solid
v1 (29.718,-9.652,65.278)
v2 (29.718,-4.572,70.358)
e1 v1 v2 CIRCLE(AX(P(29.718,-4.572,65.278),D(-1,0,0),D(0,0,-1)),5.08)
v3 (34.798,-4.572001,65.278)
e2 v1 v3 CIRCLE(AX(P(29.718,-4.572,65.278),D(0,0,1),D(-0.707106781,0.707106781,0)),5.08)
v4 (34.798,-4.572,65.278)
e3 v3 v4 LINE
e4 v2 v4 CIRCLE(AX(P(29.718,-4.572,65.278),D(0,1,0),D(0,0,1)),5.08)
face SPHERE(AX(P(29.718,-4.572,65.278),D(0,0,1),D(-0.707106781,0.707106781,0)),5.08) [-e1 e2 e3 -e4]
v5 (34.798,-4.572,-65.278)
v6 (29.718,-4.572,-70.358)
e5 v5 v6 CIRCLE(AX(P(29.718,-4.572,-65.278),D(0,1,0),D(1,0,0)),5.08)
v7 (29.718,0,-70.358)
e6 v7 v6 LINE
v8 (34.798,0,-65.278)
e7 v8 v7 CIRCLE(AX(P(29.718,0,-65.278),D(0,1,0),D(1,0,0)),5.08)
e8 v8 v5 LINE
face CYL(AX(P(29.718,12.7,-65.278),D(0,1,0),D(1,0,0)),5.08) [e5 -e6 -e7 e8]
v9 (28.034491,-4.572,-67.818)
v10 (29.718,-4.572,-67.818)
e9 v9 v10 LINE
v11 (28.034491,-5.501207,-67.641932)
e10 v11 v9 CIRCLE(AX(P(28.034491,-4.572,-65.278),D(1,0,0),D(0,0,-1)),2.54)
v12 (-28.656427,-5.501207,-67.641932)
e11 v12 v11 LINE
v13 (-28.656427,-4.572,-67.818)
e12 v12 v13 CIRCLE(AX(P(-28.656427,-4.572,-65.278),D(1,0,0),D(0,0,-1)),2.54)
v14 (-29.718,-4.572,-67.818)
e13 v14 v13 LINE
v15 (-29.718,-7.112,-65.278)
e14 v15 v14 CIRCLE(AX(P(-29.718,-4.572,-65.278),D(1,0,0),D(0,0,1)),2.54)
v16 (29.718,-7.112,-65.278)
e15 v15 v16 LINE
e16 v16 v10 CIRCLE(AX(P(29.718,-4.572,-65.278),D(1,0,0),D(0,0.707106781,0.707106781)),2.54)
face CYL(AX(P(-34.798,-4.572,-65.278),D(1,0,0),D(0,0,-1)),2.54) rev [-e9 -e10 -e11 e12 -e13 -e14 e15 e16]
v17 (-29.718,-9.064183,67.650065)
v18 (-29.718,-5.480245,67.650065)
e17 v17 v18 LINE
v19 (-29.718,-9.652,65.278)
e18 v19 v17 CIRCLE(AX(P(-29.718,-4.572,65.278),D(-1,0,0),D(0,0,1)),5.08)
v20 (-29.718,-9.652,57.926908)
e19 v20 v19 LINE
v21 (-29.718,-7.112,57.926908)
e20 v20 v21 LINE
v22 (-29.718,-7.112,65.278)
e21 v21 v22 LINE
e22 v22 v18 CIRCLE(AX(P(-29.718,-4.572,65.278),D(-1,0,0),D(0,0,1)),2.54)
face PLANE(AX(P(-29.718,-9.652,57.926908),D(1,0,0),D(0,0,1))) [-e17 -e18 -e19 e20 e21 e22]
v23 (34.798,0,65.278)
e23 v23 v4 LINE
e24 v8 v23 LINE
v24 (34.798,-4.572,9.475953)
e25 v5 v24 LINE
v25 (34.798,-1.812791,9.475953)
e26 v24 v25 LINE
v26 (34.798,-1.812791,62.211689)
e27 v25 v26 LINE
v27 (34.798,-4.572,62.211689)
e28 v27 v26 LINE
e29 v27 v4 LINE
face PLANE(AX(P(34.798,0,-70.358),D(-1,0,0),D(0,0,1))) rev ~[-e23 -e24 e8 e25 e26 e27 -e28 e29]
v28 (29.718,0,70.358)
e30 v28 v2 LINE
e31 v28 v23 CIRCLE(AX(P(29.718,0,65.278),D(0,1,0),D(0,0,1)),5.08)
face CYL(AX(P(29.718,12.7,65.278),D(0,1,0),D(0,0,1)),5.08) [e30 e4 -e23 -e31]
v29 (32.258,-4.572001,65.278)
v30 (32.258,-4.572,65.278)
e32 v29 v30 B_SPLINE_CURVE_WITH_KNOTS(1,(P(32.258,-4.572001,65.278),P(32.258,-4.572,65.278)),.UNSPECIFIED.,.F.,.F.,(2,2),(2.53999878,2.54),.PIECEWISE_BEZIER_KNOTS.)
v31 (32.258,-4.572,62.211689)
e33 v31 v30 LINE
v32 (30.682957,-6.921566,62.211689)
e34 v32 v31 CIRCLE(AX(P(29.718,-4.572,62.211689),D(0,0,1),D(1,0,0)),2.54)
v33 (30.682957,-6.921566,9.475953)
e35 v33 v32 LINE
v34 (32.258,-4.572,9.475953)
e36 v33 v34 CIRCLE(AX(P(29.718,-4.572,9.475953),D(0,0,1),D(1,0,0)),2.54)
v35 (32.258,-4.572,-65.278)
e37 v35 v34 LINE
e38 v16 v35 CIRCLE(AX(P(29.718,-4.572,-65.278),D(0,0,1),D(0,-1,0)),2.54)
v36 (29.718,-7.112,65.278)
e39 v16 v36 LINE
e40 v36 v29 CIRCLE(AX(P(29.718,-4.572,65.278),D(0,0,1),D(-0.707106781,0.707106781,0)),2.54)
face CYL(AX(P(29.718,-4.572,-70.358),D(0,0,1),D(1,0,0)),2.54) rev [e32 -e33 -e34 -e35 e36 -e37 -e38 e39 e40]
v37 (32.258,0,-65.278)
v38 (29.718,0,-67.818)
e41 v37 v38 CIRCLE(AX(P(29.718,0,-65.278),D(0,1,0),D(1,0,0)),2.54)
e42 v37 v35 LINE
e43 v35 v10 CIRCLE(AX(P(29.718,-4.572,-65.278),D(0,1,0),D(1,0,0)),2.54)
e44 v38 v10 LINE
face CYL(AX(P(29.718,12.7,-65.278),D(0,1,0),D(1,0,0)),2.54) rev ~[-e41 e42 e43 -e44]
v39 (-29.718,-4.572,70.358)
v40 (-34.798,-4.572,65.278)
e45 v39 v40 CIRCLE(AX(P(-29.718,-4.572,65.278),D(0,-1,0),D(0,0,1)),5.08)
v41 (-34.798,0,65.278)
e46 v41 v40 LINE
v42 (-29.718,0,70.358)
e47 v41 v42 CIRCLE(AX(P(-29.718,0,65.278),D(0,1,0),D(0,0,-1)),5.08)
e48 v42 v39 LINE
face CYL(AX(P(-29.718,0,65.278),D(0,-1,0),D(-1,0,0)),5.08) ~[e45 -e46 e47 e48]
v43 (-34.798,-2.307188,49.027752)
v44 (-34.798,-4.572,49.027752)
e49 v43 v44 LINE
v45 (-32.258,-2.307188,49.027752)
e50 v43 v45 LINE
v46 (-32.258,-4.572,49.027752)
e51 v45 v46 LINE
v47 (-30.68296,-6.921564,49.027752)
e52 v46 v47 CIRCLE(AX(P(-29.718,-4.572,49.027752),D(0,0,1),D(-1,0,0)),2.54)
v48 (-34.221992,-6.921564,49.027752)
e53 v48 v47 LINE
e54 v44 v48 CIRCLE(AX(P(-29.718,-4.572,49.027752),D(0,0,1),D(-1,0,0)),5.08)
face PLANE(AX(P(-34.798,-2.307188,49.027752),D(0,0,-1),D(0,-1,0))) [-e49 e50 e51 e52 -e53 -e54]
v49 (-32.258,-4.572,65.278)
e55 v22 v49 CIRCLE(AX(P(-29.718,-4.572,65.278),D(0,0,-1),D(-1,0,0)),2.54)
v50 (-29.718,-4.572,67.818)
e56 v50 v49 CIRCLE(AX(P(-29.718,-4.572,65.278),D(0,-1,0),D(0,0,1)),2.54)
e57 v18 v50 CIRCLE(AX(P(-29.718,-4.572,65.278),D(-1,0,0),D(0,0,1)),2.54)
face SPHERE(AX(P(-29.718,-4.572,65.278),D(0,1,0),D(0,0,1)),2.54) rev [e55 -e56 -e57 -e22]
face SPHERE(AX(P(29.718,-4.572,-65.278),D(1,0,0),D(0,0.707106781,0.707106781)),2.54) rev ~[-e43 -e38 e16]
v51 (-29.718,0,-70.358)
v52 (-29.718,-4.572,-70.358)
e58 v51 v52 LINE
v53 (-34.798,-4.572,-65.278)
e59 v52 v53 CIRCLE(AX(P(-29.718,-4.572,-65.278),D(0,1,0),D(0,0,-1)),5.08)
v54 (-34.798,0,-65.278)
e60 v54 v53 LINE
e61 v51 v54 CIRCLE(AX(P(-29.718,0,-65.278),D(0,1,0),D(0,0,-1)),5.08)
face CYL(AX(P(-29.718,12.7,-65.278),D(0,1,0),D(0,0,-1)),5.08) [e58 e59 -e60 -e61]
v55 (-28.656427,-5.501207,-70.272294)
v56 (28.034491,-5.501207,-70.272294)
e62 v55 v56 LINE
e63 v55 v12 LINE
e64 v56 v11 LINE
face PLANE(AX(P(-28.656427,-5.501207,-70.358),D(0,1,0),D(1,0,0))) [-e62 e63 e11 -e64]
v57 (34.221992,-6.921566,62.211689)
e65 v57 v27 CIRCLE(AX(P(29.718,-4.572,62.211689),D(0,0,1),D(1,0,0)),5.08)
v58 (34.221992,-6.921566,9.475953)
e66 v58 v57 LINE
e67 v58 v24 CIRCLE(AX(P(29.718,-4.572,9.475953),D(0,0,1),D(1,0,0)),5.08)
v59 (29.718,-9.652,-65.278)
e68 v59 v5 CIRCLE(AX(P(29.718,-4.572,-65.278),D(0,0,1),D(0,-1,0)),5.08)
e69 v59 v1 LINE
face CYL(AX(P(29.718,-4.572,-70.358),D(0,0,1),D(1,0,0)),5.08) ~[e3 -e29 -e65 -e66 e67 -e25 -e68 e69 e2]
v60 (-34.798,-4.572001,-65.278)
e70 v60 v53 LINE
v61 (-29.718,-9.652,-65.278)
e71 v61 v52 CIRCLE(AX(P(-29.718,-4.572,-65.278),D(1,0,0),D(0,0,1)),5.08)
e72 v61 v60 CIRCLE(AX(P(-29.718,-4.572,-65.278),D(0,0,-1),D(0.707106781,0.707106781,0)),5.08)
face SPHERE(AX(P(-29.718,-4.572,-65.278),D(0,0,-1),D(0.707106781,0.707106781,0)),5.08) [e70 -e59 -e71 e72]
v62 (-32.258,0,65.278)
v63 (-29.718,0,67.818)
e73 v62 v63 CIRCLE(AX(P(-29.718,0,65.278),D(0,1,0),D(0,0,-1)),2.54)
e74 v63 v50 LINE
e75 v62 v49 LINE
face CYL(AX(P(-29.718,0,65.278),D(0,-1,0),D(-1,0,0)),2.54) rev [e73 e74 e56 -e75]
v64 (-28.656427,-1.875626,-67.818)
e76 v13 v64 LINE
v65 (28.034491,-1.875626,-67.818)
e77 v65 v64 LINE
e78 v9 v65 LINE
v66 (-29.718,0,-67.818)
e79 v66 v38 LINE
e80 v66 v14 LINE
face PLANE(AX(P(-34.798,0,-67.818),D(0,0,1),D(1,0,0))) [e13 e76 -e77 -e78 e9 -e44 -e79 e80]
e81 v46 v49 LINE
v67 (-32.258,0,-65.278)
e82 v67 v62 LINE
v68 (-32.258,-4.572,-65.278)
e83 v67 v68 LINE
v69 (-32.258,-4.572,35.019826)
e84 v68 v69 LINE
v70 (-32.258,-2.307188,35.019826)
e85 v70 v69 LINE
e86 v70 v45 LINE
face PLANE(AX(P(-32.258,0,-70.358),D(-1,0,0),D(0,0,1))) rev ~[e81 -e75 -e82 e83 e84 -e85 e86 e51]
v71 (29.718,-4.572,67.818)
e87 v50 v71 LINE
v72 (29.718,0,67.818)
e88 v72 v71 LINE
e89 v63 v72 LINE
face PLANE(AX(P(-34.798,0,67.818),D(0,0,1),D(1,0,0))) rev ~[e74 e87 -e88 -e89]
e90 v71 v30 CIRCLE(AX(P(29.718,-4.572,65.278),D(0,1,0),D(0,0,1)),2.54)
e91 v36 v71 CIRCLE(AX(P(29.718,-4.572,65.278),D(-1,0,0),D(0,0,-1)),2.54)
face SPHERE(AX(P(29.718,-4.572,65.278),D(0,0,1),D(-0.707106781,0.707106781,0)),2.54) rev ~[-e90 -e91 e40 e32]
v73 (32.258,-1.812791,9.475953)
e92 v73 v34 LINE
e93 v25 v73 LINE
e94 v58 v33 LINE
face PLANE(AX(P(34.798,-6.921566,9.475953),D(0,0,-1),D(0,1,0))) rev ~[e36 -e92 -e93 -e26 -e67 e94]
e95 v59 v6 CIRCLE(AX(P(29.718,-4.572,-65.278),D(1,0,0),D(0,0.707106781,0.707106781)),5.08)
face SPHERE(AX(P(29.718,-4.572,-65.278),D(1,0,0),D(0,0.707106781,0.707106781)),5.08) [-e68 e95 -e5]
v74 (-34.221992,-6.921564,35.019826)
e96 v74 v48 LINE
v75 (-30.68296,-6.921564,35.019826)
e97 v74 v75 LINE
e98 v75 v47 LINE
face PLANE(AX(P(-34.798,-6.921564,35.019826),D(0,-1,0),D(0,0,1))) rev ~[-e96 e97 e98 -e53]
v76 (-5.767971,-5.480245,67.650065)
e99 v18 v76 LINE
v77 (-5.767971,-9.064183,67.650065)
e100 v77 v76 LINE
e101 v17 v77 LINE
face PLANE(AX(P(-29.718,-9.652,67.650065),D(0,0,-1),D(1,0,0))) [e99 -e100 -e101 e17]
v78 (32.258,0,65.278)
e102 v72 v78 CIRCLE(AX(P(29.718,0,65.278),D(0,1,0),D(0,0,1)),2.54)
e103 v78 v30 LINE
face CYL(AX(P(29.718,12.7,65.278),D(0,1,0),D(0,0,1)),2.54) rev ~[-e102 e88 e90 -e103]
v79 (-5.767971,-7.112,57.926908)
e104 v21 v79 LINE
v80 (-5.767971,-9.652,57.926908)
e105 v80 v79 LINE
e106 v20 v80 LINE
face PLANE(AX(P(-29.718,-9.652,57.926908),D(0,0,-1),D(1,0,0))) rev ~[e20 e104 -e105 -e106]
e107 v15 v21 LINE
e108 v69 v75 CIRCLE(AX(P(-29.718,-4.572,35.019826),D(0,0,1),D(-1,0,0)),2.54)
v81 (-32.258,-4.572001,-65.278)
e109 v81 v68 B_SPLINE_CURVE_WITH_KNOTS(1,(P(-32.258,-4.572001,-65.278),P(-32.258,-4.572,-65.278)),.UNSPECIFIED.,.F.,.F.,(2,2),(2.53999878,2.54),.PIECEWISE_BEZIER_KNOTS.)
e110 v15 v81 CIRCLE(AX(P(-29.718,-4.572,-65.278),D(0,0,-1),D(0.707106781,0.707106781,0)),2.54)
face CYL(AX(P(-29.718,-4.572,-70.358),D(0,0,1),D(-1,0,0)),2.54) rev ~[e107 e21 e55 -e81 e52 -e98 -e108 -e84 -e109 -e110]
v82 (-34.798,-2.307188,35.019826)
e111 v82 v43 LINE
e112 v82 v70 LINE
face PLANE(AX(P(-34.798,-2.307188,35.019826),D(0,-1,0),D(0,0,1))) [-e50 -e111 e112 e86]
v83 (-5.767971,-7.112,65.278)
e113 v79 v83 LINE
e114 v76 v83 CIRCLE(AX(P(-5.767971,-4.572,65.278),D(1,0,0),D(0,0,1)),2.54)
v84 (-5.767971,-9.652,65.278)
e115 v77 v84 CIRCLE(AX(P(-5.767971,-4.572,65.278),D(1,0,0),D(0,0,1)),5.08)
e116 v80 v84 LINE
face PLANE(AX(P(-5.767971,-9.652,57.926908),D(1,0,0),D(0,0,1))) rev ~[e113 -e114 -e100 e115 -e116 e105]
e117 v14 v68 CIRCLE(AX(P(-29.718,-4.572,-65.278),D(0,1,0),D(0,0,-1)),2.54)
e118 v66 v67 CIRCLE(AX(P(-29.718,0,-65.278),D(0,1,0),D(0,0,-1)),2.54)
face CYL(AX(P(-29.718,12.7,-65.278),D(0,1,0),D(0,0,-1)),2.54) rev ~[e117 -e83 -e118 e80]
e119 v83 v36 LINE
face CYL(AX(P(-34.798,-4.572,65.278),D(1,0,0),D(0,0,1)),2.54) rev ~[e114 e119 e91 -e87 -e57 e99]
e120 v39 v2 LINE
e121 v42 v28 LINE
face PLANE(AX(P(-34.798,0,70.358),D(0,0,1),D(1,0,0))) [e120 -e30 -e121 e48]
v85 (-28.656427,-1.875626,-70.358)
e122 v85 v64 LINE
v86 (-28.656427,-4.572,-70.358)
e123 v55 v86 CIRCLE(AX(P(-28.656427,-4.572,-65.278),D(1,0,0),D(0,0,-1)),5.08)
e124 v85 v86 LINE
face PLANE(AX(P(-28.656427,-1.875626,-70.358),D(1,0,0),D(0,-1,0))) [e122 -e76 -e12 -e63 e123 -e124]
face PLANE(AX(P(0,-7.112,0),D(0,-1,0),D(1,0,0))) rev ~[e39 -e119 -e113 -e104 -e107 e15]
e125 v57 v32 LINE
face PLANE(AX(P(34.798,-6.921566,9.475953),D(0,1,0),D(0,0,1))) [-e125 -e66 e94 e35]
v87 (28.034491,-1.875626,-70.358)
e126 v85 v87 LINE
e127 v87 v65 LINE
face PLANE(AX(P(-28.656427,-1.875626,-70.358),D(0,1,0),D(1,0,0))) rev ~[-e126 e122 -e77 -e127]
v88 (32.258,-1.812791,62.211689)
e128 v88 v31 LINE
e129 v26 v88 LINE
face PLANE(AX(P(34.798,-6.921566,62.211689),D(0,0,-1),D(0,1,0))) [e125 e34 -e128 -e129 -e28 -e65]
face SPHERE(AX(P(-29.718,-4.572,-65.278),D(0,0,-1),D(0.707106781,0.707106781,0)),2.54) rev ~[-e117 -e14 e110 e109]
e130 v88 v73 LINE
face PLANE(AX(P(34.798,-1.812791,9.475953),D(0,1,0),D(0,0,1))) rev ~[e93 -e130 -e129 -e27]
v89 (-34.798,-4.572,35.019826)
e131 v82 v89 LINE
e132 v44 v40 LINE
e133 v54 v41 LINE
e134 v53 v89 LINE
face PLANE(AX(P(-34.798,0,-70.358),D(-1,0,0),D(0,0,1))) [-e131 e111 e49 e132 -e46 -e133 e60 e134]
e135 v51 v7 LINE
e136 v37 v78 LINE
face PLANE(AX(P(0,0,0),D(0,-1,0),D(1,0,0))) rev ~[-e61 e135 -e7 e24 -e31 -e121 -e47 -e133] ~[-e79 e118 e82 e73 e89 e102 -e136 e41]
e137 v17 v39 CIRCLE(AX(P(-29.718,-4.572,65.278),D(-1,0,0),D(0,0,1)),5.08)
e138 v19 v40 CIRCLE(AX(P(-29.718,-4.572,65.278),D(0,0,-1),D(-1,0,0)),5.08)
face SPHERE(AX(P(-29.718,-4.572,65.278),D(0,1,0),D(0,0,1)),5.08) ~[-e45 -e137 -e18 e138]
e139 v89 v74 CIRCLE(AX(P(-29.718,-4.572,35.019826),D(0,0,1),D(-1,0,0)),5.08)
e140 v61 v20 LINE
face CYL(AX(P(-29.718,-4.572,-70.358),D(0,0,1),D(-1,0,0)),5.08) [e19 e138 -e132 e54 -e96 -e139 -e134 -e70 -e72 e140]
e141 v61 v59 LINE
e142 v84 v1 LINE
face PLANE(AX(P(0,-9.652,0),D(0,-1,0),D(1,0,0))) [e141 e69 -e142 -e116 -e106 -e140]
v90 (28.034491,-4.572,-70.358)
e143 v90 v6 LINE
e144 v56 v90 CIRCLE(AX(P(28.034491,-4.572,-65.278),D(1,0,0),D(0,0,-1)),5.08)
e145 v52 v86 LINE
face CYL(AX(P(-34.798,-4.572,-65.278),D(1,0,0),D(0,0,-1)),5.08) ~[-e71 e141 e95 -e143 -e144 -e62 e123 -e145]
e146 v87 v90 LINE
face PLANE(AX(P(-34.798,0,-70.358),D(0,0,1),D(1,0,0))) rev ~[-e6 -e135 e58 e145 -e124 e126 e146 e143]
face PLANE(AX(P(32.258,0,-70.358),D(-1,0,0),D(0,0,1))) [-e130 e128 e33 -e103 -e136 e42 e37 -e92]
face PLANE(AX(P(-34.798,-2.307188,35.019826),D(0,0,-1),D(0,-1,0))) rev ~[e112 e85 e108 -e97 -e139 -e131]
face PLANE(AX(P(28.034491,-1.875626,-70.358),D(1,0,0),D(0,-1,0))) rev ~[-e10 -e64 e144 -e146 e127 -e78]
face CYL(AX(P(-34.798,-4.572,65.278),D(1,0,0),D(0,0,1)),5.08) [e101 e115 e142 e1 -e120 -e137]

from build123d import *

# Parameters (mm, degrees)
F0_W        = 69.596
F0_H        = 140.716
F1_DEPTH    = 9.652
F2_R        = 5.08
F3_T1_DEPTH = 17.272
F3_S5_W     = 5.08
F3_S5_H     = 5.08
F3_T6_DEPTH = 5.08
F4_T1_DEPTH = 17.272
F4_S5_W     = 5.08
F4_S5_H     = 5.08
F4_T6_DEPTH = 5.08
F5_T1_DEPTH = 17.272
F5_S5_W     = 5.08
F5_S5_H     = 5.08
F5_T6_DEPTH = 5.08
F6_T        = -2.54
F7_W        = 23.9500291884
F7_H        = 9.7231566906
F8_DEPTH    = 25.4
F9_W        = 5.1087748725
F9_H        = 52.7357356623
F10_DEPTH   = 25.4
F11_W       = 4.6143759973
F11_H       = 14.0079259872
F12_DEPTH   = 25.4
F14_W       = 56.6909182817
F14_H       = 3.6255817395
F15_DEPTH   = 25.4


# Not quite as in the source:
# - a fillet or chamfer that OpenCascade refuses, or shapes differently, is made with other operations: its cross-section is extruded or revolved along the edge and cut away or added


with BuildPart() as f1:
    # F0 (on Front) → F1 (new body)
    with BuildSketch(Plane.XZ):
        Rectangle(F0_W, F0_H)
    extrude(amount=F1_DEPTH)

    # F2
    f2_edges = [f1.edges().sort_by_distance(p)[0] for p in [
        (-34.798, -4.826, 70.358),
        (0, -9.652, 70.358),
        (-34.798, -9.652, 0),
        (0, -9.652, -70.358),
        (34.798, -9.652, 0),
    ]]
    fillet(f2_edges, radius=F2_R)

    # F3: fillet of radius 5.08 on 1 edges, made by hand

    # F3_s2 → F3_t1 (cut)
    with BuildSketch(Plane.XZ.offset(-12.7)):
        with BuildLine():
            ThreePointArc((29.718, 70.358), (33.3101024484, 68.8701024484), (34.798, 65.278))
            Line((34.798, 65.278), (34.798, 70.358))
            Line((34.798, 70.358), (29.718, 70.358))
        make_face()
    extrude(amount=F3_T1_DEPTH, mode=Mode.SUBTRACT)


with BuildPart() as f3_tool4:
    # F3_s5 → F3_t6 (new body)
    with BuildSketch(Plane.XY.offset(65.278)):
        with Locations((32.258, -7.112)):
            Rectangle(F3_S5_W, F3_S5_H)
    extrude(amount=F3_T6_DEPTH)

    # F3_s7 → F3_t8 (revolve, cut)
    with BuildSketch(Plane(origin=(29.718, -4.572, 65.278), x_dir=(-0.7071067812, 0.7071067812, 0), z_dir=(0.7071067812, 0.7071067812, 0))):
        with BuildLine():
            ThreePointArc((0, -5.08), (5.08, 0), (0, 5.08))
            Line((0, 5.08), (0, -5.08))
        make_face()
    revolve(axis=Axis((29.718, -4.572, 65.278), (0, 0, 1)), mode=Mode.SUBTRACT)


with BuildPart() as f1_1:
    add(f1.part)

    # F3_t3: cut F3_tool4
    add(f3_tool4.part, mode=Mode.SUBTRACT)

    # F4: fillet of radius 5.08 on 1 edges, made by hand

    # F4_s2 → F4_t1 (cut)
    with BuildSketch(Plane.XZ.offset(-12.7)):
        with BuildLine():
            ThreePointArc((-29.718, -70.358), (-33.3101024484, -68.8701024484), (-34.798, -65.278))
            Line((-34.798, -65.278), (-34.798, -70.358))
            Line((-34.798, -70.358), (-29.718, -70.358))
        make_face()
    extrude(amount=F4_T1_DEPTH, mode=Mode.SUBTRACT)


with BuildPart() as f4_tool4:
    # F4_s5 → F4_t6 (new body)
    with BuildSketch(Plane.XY.offset(-65.278)):
        with Locations((-32.258, -7.112)):
            Rectangle(F4_S5_W, F4_S5_H)
    extrude(amount=-F4_T6_DEPTH)

    # F4_s7 → F4_t8 (revolve, cut)
    with BuildSketch(Plane(origin=(-29.718, -4.572, -65.278), x_dir=(0.7071067812, 0.7071067812, 0), z_dir=(-0.7071067812, 0.7071067812, 0))):
        with BuildLine():
            ThreePointArc((0, -5.08), (5.08, 0), (0, 5.08))
            Line((0, 5.08), (0, -5.08))
        make_face()
    revolve(axis=Axis((-29.718, -4.572, -65.278), (0, 0, -1)), mode=Mode.SUBTRACT)


with BuildPart() as f1_2:
    add(f1_1.part)

    # F4_t3: cut F4_tool4
    add(f4_tool4.part, mode=Mode.SUBTRACT)

    # F5: fillet of radius 5.08 on 1 edges, made by hand

    # F5_s2 → F5_t1 (cut)
    with BuildSketch(Plane.XZ.offset(-12.7)):
        with BuildLine():
            ThreePointArc((34.798, -65.278), (33.3101024484, -68.8701024484), (29.718, -70.358))
            Line((29.718, -70.358), (34.798, -70.358))
            Line((34.798, -70.358), (34.798, -65.278))
        make_face()
    extrude(amount=F5_T1_DEPTH, mode=Mode.SUBTRACT)


with BuildPart() as f5_tool4:
    # F5_s5 → F5_t6 (new body)
    with BuildSketch(Plane.YZ.offset(29.718)):
        with Locations((-7.112, -67.818)):
            Rectangle(F5_S5_W, F5_S5_H)
    extrude(amount=F5_T6_DEPTH)

    # F5_s7 → F5_t8 (revolve, cut)
    with BuildSketch(Plane(origin=(29.718, -4.572, -65.278), x_dir=(0, 0.7071067812, 0.7071067812), z_dir=(0, 0.7071067812, -0.7071067812))):
        with BuildLine():
            ThreePointArc((0, -5.08), (5.08, 0), (0, 5.08))
            Line((0, 5.08), (0, -5.08))
        make_face()
    revolve(axis=Axis((29.718, -4.572, -65.278), (1, 0, 0)), mode=Mode.SUBTRACT)


with BuildPart() as f1_3:
    add(f1_2.part)

    # F5_t3: cut F5_tool4
    add(f5_tool4.part, mode=Mode.SUBTRACT)

    # F6
    f6_openings = [f1_3.faces().sort_by_distance(p)[0] for p in [
        (0, 0, 0),
    ]]
    offset(amount=F6_T, openings=f6_openings)

    # F7 (on face) → F8 (cut)
    with BuildSketch(Plane.XZ.offset(9.652)):
        with Locations((-17.7429854058, 62.7884864807)):
            Rectangle(F7_W, F7_H)
    extrude(amount=-F8_DEPTH, mode=Mode.SUBTRACT)

    # F9 (on face) → F10 (cut)
    with BuildSketch(Plane.YZ.offset(34.798)):
        with Locations((-4.3671781896, 35.8438207768)):
            Rectangle(F9_W, F9_H)
    extrude(amount=-F10_DEPTH, mode=Mode.SUBTRACT)

    # F11 (on face) → F12 (cut)
    with BuildSketch(Plane(origin=(-34.798, 0, 0), x_dir=(0, -1, 0), z_dir=(-1, 0, 0))):
        with Locations((4.6143762302, 42.0237891376)):
            Rectangle(F11_W, F11_H)
    extrude(amount=-F12_DEPTH, mode=Mode.SUBTRACT)

    # F14 (on face) → F15 (cut)
    with BuildSketch(Plane(origin=(0, 0, -70.358), x_dir=(1, 0, 0), z_dir=(0, 0, -1))):
        with Locations((-0.3109676763, 3.6884165602)):
            Rectangle(F14_W, F14_H)
    extrude(amount=-F15_DEPTH, mode=Mode.SUBTRACT)


solid = f1_3.part
